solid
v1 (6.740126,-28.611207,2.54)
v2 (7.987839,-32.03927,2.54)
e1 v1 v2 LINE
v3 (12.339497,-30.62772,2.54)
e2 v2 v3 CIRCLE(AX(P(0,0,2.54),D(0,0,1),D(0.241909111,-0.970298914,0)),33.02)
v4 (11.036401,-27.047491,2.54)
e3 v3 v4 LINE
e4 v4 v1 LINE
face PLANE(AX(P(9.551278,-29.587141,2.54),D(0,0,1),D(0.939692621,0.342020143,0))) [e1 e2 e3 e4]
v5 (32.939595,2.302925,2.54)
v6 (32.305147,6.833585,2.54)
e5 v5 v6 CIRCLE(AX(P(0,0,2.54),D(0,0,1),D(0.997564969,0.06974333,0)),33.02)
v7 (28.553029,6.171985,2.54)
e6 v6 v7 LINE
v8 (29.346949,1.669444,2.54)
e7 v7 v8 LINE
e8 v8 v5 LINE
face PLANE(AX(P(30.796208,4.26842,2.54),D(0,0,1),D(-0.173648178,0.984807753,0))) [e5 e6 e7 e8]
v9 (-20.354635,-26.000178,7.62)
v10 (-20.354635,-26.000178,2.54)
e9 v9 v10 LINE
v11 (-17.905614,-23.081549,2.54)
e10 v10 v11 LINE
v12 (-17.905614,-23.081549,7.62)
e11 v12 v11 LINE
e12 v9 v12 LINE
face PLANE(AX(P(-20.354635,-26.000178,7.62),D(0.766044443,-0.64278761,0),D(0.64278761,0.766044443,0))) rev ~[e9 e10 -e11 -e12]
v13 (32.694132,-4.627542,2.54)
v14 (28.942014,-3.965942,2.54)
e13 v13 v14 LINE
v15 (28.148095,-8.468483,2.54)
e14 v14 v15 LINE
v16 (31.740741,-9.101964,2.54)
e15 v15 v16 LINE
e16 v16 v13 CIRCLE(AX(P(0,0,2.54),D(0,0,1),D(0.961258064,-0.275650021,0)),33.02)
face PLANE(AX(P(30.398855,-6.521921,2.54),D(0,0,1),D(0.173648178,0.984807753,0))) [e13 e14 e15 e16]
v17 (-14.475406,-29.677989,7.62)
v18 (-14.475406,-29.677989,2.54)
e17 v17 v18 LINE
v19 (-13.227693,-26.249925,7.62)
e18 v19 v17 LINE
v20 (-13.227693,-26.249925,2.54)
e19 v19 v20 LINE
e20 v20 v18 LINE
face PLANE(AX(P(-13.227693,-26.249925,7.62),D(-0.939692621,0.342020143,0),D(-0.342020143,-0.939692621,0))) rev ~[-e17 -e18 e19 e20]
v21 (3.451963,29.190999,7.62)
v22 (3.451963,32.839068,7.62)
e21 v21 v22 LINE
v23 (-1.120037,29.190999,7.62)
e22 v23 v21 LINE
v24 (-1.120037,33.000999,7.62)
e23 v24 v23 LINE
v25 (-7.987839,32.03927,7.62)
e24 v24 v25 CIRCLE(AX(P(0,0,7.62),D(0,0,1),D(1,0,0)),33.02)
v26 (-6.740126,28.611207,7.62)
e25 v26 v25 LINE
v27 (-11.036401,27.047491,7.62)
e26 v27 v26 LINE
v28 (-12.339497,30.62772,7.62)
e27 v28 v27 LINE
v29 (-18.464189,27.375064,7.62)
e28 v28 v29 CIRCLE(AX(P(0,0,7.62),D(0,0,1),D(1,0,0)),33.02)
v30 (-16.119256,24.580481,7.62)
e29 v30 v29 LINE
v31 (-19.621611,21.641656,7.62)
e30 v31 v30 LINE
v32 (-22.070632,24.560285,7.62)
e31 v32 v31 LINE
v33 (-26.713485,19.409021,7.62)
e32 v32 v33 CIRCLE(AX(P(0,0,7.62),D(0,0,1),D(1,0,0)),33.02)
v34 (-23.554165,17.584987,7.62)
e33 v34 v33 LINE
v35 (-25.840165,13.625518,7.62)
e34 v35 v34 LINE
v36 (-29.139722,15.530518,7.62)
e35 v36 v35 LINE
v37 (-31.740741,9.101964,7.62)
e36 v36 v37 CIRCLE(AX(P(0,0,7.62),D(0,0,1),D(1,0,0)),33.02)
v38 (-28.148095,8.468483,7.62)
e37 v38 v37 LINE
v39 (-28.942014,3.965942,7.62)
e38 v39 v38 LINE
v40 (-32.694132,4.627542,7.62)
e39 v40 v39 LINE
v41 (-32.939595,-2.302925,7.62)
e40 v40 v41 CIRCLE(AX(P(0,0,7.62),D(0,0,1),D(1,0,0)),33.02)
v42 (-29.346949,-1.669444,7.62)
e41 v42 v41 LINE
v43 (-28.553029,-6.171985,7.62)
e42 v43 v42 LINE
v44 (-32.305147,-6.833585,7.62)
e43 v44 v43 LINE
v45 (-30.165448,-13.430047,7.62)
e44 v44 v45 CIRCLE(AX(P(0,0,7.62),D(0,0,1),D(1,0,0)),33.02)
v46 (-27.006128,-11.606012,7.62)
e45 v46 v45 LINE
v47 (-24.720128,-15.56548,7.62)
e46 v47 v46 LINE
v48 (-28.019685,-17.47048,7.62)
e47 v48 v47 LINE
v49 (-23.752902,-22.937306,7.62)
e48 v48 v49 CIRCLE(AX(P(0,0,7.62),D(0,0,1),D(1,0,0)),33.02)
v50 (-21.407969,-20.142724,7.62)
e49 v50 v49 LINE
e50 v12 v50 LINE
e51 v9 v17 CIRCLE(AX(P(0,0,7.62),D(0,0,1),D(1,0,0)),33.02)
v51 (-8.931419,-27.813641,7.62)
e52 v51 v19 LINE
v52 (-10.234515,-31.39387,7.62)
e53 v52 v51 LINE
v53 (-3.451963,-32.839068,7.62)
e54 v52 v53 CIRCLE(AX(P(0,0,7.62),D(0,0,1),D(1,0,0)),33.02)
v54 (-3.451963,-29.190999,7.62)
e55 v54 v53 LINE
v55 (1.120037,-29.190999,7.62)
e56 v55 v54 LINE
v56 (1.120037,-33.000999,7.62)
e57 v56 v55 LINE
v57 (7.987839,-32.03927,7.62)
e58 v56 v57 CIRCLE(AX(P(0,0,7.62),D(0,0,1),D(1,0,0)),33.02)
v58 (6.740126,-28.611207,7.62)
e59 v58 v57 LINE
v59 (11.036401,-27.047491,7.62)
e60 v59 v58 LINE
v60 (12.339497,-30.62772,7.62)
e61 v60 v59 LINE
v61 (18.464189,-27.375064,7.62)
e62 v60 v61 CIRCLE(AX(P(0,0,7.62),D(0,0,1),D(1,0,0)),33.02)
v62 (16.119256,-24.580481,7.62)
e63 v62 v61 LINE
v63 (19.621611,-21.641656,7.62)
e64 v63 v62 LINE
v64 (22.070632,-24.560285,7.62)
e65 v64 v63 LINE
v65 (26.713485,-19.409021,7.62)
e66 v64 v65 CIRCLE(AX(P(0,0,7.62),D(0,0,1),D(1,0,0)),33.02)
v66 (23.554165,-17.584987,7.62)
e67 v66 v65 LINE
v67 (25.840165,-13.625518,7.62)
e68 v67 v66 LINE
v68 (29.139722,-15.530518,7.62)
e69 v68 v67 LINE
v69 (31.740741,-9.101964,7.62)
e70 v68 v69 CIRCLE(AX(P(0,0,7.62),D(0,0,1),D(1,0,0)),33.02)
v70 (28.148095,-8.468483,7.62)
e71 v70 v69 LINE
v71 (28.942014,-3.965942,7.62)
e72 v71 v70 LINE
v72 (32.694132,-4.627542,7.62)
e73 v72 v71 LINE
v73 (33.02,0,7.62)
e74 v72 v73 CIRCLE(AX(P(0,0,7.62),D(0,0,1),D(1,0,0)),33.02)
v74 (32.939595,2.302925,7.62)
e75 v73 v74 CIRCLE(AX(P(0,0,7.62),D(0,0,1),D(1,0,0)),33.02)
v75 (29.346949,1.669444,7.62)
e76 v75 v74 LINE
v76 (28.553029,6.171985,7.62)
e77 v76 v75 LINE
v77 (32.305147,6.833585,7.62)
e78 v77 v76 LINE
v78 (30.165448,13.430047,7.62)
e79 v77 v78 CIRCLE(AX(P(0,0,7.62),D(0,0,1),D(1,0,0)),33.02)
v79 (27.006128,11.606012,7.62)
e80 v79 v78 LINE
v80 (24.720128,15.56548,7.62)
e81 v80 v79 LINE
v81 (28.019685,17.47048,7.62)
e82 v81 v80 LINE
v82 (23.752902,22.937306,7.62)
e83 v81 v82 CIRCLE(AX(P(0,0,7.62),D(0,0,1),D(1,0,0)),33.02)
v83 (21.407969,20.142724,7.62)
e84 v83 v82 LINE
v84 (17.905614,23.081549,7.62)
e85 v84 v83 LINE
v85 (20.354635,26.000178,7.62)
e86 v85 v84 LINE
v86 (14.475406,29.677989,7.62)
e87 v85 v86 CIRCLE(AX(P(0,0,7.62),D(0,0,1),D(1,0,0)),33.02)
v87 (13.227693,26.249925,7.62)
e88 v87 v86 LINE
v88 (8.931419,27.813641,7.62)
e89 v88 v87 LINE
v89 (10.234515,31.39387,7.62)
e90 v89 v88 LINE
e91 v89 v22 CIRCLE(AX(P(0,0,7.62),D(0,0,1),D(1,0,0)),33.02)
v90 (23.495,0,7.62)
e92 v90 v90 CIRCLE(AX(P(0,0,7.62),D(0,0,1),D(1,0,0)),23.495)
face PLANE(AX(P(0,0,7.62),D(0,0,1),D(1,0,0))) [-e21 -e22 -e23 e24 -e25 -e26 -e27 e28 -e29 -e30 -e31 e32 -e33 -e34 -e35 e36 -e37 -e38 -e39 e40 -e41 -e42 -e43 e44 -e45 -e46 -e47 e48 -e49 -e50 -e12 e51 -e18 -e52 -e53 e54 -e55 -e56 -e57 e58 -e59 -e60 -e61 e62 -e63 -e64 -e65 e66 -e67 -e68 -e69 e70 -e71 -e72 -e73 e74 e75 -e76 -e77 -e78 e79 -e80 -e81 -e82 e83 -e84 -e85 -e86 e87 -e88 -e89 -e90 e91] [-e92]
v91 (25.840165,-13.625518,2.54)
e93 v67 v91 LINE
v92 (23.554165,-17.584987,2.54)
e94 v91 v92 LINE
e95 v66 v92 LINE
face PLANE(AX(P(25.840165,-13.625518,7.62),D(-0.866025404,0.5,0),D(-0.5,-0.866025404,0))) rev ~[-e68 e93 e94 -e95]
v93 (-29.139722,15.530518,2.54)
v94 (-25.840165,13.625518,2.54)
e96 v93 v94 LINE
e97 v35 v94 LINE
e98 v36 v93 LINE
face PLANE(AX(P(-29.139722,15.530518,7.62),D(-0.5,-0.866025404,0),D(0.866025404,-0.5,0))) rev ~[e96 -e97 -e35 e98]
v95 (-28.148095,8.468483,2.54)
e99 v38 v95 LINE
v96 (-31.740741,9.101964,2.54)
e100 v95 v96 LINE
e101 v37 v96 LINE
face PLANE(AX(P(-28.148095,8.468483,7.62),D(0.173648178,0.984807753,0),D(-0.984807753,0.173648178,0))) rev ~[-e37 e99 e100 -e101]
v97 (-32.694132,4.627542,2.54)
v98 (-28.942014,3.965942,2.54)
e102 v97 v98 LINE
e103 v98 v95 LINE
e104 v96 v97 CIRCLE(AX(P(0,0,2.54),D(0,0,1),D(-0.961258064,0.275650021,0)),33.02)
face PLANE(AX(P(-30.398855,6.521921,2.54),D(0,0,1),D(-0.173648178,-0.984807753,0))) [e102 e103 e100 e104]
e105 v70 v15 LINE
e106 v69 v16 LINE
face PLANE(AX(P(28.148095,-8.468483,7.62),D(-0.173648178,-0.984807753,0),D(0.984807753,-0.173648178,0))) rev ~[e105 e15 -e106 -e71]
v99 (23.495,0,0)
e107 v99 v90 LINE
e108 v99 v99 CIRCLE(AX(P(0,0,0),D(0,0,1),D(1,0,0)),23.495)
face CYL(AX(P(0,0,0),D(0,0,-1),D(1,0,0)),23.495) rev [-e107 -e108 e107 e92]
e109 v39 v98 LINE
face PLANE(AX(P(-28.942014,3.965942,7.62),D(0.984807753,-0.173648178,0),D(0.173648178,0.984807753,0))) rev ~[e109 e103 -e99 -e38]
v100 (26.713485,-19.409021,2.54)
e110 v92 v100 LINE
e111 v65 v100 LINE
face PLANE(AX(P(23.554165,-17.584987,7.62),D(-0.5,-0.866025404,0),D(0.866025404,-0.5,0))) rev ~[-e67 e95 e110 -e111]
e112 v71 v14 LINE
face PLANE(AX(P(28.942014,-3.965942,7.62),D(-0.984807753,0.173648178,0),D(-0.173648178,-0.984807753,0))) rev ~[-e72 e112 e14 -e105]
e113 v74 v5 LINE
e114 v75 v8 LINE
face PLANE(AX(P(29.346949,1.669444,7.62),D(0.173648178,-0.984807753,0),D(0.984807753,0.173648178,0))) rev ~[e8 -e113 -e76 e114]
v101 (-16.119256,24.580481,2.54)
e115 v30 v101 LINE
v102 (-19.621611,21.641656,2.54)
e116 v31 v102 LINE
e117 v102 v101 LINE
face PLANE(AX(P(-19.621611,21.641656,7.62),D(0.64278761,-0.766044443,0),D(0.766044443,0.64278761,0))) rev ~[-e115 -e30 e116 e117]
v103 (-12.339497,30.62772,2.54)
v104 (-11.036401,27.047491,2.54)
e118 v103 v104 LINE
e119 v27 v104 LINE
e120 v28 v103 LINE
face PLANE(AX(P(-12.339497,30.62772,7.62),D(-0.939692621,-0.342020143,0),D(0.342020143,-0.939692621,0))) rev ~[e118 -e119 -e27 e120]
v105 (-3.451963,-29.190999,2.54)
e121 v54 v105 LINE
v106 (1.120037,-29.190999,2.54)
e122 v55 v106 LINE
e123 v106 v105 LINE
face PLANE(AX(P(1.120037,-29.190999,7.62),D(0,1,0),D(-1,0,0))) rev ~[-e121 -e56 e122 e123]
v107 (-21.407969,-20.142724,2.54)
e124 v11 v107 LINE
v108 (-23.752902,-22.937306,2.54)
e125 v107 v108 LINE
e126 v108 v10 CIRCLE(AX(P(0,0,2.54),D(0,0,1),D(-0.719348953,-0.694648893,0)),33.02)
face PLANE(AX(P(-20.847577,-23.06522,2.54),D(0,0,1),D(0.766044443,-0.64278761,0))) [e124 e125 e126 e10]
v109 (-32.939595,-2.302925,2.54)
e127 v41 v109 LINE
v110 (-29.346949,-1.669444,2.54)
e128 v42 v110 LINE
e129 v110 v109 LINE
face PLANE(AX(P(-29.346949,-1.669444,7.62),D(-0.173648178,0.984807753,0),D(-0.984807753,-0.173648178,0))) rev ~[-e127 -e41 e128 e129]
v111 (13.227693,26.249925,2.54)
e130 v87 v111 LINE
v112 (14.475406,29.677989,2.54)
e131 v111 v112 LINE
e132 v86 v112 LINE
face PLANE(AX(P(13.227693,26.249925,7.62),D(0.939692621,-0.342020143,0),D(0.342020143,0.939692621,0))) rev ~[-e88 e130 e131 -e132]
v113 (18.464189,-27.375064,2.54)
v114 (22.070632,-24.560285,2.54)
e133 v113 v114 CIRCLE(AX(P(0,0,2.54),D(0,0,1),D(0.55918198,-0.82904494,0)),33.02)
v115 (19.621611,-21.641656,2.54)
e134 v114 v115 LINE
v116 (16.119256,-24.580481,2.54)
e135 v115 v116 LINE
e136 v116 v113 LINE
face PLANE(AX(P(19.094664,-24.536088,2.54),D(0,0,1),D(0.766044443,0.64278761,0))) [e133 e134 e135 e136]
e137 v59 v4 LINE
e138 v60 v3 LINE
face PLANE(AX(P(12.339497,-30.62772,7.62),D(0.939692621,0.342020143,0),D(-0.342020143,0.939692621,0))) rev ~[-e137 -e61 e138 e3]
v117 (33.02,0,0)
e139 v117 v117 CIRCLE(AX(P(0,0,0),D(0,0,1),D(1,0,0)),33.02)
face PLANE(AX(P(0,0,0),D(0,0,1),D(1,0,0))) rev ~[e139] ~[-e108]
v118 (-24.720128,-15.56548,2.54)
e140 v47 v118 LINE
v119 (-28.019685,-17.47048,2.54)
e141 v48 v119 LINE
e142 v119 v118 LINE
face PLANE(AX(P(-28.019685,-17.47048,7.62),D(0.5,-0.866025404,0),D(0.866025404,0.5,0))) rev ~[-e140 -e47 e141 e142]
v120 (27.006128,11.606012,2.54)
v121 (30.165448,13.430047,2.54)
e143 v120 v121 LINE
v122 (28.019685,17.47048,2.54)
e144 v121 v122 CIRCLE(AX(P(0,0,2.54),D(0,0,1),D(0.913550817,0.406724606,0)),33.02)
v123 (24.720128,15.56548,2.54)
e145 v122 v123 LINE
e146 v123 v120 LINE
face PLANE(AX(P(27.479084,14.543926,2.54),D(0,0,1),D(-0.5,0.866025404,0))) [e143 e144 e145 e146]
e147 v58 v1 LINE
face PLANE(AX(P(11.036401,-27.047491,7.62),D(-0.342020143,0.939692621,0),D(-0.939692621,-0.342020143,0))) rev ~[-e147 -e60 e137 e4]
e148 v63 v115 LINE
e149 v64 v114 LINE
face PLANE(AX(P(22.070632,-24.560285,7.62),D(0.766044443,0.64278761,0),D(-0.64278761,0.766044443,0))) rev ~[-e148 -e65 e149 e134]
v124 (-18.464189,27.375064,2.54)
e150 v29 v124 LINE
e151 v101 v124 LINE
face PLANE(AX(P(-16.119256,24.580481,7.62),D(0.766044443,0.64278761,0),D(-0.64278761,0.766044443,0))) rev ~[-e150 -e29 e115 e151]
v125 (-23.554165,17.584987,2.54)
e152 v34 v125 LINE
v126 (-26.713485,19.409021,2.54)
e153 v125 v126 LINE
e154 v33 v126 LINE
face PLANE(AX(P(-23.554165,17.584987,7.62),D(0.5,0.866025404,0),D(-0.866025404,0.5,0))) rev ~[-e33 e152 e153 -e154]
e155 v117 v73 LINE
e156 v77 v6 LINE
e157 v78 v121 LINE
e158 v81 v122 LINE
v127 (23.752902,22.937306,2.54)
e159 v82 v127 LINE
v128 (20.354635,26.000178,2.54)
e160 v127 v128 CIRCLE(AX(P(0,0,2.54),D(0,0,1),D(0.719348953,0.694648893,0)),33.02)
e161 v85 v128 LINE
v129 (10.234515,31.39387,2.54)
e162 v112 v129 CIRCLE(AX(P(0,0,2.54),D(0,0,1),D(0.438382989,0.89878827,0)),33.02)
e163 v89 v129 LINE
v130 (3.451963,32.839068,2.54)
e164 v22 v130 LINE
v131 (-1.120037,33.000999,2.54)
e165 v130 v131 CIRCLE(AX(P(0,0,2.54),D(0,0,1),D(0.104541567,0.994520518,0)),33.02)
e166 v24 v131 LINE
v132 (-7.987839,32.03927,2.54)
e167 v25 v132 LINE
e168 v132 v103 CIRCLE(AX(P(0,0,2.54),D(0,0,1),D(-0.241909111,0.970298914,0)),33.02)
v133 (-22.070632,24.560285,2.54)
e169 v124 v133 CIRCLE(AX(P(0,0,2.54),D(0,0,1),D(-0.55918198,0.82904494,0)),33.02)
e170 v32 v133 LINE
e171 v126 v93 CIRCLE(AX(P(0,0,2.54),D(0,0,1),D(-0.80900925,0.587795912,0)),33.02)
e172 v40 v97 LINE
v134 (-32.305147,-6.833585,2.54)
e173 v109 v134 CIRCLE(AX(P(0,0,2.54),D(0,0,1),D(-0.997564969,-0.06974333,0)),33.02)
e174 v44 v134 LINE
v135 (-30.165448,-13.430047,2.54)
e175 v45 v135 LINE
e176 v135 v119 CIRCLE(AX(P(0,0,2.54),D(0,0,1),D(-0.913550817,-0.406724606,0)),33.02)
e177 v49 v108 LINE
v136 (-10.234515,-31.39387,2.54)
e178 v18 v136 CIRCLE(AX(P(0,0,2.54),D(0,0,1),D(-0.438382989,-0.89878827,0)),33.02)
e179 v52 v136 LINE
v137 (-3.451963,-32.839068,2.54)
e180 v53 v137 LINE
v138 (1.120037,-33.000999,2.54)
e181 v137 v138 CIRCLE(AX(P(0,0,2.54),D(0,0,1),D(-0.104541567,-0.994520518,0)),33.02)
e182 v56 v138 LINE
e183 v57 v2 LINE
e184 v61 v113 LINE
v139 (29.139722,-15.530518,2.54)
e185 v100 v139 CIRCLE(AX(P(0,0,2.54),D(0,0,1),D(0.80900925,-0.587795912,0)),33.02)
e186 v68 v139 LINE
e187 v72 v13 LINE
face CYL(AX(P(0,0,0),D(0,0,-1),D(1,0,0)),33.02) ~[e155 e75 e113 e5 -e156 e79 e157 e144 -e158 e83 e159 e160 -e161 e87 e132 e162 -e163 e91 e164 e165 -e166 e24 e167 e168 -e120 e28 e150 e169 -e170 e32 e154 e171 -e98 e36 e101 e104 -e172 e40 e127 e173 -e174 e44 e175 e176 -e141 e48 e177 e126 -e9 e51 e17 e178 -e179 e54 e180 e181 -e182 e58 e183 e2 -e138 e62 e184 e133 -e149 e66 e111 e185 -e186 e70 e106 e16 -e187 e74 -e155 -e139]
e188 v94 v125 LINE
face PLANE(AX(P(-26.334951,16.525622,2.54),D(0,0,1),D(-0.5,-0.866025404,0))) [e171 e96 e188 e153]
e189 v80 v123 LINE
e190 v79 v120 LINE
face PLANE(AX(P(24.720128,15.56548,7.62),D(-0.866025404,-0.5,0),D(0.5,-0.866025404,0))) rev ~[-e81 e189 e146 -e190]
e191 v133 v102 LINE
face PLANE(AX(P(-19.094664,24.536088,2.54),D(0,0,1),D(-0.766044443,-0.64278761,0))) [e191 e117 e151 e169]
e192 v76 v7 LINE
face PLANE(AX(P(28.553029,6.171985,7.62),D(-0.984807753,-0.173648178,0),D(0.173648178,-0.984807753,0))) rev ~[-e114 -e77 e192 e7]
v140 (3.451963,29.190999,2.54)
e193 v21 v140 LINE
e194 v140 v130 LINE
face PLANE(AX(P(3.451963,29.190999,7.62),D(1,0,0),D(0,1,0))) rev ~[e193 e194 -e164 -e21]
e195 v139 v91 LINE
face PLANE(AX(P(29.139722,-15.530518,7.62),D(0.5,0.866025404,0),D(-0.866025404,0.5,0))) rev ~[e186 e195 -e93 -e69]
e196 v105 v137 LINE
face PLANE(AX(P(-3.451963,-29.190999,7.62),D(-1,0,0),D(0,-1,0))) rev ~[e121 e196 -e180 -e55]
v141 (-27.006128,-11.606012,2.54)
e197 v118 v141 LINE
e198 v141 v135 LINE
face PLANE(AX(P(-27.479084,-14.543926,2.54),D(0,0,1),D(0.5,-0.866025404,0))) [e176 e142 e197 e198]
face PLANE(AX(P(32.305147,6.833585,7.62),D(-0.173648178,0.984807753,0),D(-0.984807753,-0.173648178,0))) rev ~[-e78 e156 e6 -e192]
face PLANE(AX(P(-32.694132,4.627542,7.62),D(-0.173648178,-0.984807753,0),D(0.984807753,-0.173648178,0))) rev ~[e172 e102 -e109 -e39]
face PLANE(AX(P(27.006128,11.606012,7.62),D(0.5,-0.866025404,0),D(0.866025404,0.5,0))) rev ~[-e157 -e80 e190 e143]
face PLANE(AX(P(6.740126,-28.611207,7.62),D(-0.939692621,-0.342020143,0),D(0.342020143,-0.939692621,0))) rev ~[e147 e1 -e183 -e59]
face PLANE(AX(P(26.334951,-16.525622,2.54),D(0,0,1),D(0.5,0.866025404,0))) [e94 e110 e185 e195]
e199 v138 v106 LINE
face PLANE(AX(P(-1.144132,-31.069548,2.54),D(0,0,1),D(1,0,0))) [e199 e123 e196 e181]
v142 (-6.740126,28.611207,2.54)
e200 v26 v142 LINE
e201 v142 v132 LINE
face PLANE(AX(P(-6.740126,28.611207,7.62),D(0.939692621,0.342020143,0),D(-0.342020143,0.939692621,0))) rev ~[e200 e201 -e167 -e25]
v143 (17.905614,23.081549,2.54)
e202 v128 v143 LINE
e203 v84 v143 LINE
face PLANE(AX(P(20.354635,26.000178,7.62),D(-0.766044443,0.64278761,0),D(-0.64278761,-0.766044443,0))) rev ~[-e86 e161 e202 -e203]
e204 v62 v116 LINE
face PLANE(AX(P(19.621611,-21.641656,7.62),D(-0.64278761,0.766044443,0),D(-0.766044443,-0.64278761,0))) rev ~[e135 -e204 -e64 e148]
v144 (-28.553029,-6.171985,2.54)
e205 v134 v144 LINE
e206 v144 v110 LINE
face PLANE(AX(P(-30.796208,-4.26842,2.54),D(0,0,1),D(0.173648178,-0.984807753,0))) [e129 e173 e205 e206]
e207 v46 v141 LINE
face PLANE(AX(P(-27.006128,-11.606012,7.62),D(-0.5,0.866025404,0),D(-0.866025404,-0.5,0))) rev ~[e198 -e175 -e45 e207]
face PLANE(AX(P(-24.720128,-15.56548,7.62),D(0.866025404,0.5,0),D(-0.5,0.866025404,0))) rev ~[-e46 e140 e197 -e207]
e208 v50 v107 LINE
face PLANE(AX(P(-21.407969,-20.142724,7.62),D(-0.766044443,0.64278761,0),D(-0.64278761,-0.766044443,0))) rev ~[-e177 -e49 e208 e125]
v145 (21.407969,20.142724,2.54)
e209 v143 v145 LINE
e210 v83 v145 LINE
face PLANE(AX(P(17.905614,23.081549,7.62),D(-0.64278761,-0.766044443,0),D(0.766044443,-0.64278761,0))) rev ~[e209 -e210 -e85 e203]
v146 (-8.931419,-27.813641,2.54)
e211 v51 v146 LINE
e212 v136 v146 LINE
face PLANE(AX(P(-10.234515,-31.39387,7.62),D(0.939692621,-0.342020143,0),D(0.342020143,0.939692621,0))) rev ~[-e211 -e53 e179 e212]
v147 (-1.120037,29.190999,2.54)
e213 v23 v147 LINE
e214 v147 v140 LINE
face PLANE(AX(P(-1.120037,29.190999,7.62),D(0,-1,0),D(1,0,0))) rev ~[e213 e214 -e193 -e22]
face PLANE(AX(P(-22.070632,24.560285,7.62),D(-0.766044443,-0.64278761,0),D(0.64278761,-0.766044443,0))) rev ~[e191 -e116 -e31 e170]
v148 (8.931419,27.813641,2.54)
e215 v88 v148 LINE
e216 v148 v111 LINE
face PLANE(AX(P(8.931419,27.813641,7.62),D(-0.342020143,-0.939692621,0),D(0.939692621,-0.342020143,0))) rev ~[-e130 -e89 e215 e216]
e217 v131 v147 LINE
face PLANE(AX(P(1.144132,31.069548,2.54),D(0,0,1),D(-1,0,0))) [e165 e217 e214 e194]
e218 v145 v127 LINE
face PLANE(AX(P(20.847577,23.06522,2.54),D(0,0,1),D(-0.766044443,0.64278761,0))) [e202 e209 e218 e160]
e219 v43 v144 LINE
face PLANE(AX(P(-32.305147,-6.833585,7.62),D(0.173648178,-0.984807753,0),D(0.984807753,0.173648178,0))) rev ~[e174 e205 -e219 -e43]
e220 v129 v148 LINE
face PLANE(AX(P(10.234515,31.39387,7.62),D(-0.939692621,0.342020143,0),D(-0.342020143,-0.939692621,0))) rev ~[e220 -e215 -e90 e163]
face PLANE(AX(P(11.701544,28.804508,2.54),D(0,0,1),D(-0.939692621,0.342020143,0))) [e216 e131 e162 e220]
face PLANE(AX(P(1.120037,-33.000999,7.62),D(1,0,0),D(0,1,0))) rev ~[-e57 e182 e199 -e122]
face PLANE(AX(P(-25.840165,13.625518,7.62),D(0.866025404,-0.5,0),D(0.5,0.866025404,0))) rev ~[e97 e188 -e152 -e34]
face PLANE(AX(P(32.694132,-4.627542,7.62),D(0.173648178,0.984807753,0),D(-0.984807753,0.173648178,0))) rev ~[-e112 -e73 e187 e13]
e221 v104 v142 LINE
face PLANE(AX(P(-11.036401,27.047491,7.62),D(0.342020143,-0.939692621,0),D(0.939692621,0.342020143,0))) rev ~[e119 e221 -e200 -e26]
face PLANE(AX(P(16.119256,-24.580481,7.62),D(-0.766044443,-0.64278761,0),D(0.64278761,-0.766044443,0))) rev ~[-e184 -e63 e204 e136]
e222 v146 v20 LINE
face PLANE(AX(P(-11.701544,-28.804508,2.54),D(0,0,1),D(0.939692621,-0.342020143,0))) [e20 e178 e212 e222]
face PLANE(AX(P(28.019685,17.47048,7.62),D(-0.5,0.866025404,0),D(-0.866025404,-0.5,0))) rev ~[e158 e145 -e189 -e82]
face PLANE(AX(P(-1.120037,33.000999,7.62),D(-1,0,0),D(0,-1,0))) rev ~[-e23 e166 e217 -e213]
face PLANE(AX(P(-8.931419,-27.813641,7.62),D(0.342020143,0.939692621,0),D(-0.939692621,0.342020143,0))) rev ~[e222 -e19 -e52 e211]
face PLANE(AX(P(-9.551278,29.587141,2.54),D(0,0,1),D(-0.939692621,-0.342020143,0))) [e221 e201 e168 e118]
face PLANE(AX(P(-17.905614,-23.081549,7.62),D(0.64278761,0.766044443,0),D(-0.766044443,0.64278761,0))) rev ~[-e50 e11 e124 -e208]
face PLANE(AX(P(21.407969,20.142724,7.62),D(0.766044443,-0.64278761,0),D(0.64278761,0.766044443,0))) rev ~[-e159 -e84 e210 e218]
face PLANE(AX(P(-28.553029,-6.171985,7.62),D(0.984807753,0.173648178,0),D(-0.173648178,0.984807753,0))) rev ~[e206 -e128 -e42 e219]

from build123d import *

# Parameters (mm, degrees)
F0_R            = 33.02
F0_R_2          = 23.495
F1_DEPTH        = 7.62
F3_DEPTH        = 5.08
F3_COPIES_COUNT = 18


# Not quite as in the source:
# - a pattern or mirror of a feature is missing from the dataset's text; its kind, count and spacing are read off the source's solid


with BuildPart() as f1:
    # F0 (on Top) → F1 (new body)
    with BuildSketch(Plane.XY):
        Circle(F0_R)
        Circle(F0_R_2, mode=Mode.SUBTRACT)
    extrude(amount=F1_DEPTH)

    # F2 (on face) → F3 (cut)
    with BuildSketch(Plane.XY.offset(7.62)):
        with BuildLine():
            Line((-3.4519625326, -29.1909987132), (-3.4519625326, -32.8390675061))
            ThreePointArc((-3.4519625326, -32.8390675061), (-1.1687703181, -32.9993087192), (1.1200374674, -33.0009987132))
            Line((1.1200374674, -33.0009987132), (1.1200374674, -29.1909987132))
            Line((1.1200374674, -29.1909987132), (-3.4519625326, -29.1909987132))
        make_face()
    f3 = extrude(amount=-F3_DEPTH, mode=Mode.SUBTRACT)

    # F3_copies: F3 ×18 about axis
    f3_copies_axis = Axis((0, 0, 0), (0, 0, 1))
    for i in range(1, F3_COPIES_COUNT):
        add(f3.rotate(f3_copies_axis, i * 360 / F3_COPIES_COUNT), mode=Mode.SUBTRACT)


solid = f1.part
